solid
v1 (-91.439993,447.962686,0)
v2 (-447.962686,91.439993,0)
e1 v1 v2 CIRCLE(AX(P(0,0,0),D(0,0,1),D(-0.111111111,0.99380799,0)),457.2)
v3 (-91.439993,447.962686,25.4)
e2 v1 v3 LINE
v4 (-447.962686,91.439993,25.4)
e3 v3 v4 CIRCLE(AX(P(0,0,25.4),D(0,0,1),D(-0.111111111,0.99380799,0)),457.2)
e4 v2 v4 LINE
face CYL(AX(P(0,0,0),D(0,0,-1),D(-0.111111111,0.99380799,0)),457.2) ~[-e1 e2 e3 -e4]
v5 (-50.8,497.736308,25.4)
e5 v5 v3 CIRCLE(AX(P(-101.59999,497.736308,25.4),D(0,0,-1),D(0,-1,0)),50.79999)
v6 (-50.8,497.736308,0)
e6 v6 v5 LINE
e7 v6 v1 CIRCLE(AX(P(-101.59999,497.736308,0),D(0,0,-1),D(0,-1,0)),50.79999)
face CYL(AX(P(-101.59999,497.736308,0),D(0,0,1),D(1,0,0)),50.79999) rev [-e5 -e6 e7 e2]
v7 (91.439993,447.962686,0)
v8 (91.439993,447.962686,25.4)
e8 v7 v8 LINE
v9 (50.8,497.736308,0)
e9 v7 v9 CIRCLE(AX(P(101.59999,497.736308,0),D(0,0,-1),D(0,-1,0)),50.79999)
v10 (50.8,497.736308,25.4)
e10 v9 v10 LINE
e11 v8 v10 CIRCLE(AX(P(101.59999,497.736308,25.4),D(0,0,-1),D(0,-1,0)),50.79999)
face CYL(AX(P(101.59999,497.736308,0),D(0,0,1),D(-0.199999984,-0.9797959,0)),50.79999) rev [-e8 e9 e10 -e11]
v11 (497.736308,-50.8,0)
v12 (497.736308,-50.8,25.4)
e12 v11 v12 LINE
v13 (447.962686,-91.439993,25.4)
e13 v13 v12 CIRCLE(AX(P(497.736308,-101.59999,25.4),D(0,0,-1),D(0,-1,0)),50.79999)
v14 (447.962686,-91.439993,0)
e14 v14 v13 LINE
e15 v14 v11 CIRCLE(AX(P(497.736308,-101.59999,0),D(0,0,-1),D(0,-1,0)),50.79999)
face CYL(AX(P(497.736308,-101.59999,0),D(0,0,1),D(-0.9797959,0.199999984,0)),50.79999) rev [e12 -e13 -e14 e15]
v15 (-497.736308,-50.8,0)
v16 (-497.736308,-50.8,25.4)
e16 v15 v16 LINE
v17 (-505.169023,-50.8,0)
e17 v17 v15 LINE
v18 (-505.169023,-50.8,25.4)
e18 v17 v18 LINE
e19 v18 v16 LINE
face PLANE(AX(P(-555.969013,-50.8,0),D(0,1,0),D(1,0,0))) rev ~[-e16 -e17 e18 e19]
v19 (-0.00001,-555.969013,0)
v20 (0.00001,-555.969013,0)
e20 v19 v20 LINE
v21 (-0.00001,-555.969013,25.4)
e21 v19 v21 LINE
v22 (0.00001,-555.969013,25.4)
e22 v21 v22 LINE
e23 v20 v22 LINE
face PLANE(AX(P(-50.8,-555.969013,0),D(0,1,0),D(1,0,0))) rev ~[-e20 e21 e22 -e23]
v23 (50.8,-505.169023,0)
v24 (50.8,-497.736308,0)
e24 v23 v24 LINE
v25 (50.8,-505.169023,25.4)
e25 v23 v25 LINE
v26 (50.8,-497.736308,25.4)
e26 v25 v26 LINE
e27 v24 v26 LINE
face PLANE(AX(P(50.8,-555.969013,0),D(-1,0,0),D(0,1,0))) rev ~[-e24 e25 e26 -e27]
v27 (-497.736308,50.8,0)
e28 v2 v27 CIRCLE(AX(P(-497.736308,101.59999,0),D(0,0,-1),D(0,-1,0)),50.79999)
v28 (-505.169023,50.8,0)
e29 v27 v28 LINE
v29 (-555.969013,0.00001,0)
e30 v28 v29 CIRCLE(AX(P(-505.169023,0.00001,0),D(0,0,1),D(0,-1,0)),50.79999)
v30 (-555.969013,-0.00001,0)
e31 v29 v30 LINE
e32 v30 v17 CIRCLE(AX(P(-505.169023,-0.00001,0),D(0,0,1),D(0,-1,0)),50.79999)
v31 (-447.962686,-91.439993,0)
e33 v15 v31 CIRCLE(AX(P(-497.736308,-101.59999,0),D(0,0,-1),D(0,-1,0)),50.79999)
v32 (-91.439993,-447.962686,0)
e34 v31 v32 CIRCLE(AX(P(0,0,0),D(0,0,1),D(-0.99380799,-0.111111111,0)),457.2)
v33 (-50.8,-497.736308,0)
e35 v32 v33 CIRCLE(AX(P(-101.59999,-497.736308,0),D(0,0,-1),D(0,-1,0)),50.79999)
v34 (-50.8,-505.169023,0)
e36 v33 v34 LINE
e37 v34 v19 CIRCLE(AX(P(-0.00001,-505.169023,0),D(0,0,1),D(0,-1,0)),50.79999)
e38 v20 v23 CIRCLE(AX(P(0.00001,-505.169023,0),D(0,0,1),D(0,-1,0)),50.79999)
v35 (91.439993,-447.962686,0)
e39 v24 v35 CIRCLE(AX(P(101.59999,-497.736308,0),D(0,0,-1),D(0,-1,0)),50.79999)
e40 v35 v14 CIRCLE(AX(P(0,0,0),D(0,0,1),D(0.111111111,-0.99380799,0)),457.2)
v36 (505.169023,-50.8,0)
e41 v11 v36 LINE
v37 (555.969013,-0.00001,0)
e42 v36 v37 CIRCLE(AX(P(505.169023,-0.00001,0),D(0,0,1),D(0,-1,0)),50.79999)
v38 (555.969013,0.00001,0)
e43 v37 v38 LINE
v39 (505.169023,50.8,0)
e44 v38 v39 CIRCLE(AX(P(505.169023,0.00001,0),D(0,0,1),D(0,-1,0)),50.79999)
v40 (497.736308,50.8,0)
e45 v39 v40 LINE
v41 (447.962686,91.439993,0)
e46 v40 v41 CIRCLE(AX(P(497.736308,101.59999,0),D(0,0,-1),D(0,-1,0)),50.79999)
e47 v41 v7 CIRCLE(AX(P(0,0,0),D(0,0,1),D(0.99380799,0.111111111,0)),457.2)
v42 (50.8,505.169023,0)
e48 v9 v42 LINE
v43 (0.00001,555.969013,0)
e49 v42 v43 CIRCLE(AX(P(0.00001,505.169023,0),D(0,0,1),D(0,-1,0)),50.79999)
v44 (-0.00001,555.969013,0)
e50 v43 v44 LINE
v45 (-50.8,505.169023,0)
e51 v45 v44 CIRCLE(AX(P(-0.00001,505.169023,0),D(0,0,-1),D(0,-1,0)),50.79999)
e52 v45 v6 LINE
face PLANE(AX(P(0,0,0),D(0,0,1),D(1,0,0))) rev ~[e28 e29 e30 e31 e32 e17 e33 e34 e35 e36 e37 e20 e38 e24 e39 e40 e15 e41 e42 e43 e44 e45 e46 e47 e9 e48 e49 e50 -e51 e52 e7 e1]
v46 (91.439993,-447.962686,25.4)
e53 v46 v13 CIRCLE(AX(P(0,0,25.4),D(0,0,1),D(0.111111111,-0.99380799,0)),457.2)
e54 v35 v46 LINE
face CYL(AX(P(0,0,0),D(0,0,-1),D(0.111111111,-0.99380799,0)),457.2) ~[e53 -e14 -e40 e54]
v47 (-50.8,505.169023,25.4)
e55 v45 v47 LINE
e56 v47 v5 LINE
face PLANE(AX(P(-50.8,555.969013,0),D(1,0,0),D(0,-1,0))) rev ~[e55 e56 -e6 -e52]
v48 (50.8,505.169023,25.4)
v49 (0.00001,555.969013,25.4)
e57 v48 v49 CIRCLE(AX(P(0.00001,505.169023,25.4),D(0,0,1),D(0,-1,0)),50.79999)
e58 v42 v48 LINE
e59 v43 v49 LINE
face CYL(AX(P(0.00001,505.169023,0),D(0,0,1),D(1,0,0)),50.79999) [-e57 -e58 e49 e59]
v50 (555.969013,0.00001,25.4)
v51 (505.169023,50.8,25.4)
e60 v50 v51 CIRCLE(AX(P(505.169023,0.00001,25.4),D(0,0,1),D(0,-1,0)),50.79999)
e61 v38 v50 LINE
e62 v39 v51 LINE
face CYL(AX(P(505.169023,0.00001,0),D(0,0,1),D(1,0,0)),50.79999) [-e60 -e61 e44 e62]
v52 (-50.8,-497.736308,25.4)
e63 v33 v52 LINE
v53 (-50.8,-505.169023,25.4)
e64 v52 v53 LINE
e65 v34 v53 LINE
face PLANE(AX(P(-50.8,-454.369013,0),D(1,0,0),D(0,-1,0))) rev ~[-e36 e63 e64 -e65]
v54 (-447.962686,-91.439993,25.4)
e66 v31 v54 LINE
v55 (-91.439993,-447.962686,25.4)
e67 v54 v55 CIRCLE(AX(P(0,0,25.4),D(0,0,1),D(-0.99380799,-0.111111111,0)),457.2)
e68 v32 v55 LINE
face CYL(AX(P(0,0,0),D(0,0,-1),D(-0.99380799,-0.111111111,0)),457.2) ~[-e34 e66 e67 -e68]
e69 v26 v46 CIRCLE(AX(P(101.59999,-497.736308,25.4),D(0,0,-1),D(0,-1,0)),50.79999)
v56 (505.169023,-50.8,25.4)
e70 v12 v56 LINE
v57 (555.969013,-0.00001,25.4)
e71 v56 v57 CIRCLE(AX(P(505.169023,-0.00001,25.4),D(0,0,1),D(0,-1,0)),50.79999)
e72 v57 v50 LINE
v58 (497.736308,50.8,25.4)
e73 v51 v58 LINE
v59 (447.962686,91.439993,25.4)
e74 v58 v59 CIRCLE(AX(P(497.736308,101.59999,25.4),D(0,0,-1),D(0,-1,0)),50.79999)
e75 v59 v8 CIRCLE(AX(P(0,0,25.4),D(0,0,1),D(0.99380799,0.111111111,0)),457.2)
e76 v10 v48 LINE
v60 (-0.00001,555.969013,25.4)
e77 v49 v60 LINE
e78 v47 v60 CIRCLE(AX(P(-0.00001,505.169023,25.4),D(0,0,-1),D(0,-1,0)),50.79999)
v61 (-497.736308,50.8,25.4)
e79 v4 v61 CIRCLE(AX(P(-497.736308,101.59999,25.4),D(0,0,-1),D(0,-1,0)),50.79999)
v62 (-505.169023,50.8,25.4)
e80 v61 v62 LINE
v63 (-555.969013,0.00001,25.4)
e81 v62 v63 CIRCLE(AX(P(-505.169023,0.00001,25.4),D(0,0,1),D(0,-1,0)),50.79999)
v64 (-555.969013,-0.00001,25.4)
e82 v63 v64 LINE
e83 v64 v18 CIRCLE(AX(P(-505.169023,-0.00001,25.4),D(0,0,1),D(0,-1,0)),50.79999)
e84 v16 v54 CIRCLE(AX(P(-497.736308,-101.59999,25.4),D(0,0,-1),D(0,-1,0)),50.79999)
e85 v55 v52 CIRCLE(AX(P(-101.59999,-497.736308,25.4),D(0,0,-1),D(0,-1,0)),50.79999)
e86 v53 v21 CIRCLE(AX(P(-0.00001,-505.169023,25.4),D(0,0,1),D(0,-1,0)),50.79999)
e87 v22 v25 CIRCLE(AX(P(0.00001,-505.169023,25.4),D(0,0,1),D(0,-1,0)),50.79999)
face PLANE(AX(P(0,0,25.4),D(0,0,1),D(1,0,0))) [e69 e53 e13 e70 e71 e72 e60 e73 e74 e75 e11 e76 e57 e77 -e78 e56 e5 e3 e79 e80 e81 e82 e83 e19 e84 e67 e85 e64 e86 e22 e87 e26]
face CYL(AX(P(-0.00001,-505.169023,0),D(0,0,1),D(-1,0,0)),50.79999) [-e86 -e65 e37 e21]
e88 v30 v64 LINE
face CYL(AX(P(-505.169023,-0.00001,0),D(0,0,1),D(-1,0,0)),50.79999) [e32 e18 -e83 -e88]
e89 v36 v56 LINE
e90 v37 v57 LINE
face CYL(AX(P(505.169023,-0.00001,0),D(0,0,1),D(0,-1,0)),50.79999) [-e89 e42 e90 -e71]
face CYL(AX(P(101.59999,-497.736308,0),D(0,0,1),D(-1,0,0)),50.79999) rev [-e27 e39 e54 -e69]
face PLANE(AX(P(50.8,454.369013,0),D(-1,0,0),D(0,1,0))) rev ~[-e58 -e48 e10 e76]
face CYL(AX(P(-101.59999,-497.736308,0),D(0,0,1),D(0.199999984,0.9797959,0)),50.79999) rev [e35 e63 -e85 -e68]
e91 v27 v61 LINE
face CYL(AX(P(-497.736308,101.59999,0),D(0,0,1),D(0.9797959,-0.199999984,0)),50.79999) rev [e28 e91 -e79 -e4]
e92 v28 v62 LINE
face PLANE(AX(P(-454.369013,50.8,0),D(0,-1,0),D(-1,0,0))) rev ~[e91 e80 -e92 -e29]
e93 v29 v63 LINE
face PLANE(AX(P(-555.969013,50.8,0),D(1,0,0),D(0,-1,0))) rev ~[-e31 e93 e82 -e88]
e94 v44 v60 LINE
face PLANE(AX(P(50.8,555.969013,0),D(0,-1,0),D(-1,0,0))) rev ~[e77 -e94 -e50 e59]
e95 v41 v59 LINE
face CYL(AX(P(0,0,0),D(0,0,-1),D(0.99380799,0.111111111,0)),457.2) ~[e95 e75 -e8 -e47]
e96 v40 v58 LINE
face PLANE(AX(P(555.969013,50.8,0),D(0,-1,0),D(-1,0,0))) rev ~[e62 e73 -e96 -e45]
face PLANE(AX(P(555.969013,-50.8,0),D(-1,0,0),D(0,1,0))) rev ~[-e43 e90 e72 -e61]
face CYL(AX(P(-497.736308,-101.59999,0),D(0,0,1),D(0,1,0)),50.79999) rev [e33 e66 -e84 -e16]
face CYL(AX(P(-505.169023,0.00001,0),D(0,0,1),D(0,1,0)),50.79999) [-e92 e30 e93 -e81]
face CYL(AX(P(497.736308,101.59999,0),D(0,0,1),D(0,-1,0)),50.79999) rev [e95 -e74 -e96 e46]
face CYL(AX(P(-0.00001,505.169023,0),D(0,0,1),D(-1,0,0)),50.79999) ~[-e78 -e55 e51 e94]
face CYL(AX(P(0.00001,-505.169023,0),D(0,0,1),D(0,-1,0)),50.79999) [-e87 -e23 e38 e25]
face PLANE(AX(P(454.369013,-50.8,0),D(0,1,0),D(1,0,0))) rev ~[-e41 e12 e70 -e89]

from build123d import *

# Parameters (mm, degrees)
F1_DEPTH = 25.4
F2_R     = 50.79999


# Not quite as in the source:
# - a fillet or chamfer is up to 0.001 mm smaller than in the source, because OpenCascade refuses the exact size


with BuildPart() as f1:
    # F0 (on Top) → F1 (new body)
    with BuildSketch(Plane.XY):
        with BuildLine():
            Line((-50.8, 555.969013028), (-50.8, 454.369013028))
            ThreePointArc((-50.8, 454.369013028), (-323.2892203585, 323.2892203585), (-454.369013028, 50.8))
            Line((-454.369013028, 50.8), (-555.969013028, 50.8))
            Line((-555.969013028, 50.8), (-555.969013028, -50.8))
            Line((-555.969013028, -50.8), (-454.369013028, -50.8))
            ThreePointArc((-454.369013028, -50.8), (-323.2892203585, -323.2892203585), (-50.8, -454.369013028))
            Line((-50.8, -454.369013028), (-50.8, -555.969013028))
            Line((-50.8, -555.969013028), (50.8, -555.969013028))
            Line((50.8, -555.969013028), (50.8, -454.369013028))
            ThreePointArc((50.8, -454.369013028), (323.2892203585, -323.2892203585), (454.369013028, -50.8))
            Line((454.369013028, -50.8), (555.969013028, -50.8))
            Line((555.969013028, -50.8), (555.969013028, 50.8))
            Line((555.969013028, 50.8), (454.369013028, 50.8))
            ThreePointArc((454.369013028, 50.8), (323.2892203585, 323.2892203585), (50.8, 454.369013028))
            Line((50.8, 454.369013028), (50.8, 555.969013028))
            Line((50.8, 555.969013028), (-50.8, 555.969013028))
        make_face()
    extrude(amount=F1_DEPTH)

    # F2 (radius 50.8 in the source; OpenCascade refuses exactly that, so slightly less here)
    f2_edges = [f1.edges().sort_by_distance(p)[0] for p in [
        (50.8, -555.969013, 12.7),
        (-50.8, -555.969013, 12.7),
        (555.969013, -50.8, 12.7),
        (555.969013, 50.8, 12.7),
        (50.8, 555.969013, 12.7),
        (-50.8, 555.969013, 12.7),
        (-555.969013, 50.8, 12.7),
        (-555.969013, -50.8, 12.7),
        (50.8, -454.369013, 12.7),
        (454.369013, -50.8, 12.7),
        (454.369013, 50.8, 12.7),
        (50.8, 454.369013, 12.7),
        (-50.8, 454.369013, 12.7),
        (-454.369013, 50.8, 12.7),
        (-454.369013, -50.8, 12.7),
        (-50.8, -454.369013, 12.7),
    ]]
    fillet(f2_edges, radius=F2_R)


solid = f1.part
